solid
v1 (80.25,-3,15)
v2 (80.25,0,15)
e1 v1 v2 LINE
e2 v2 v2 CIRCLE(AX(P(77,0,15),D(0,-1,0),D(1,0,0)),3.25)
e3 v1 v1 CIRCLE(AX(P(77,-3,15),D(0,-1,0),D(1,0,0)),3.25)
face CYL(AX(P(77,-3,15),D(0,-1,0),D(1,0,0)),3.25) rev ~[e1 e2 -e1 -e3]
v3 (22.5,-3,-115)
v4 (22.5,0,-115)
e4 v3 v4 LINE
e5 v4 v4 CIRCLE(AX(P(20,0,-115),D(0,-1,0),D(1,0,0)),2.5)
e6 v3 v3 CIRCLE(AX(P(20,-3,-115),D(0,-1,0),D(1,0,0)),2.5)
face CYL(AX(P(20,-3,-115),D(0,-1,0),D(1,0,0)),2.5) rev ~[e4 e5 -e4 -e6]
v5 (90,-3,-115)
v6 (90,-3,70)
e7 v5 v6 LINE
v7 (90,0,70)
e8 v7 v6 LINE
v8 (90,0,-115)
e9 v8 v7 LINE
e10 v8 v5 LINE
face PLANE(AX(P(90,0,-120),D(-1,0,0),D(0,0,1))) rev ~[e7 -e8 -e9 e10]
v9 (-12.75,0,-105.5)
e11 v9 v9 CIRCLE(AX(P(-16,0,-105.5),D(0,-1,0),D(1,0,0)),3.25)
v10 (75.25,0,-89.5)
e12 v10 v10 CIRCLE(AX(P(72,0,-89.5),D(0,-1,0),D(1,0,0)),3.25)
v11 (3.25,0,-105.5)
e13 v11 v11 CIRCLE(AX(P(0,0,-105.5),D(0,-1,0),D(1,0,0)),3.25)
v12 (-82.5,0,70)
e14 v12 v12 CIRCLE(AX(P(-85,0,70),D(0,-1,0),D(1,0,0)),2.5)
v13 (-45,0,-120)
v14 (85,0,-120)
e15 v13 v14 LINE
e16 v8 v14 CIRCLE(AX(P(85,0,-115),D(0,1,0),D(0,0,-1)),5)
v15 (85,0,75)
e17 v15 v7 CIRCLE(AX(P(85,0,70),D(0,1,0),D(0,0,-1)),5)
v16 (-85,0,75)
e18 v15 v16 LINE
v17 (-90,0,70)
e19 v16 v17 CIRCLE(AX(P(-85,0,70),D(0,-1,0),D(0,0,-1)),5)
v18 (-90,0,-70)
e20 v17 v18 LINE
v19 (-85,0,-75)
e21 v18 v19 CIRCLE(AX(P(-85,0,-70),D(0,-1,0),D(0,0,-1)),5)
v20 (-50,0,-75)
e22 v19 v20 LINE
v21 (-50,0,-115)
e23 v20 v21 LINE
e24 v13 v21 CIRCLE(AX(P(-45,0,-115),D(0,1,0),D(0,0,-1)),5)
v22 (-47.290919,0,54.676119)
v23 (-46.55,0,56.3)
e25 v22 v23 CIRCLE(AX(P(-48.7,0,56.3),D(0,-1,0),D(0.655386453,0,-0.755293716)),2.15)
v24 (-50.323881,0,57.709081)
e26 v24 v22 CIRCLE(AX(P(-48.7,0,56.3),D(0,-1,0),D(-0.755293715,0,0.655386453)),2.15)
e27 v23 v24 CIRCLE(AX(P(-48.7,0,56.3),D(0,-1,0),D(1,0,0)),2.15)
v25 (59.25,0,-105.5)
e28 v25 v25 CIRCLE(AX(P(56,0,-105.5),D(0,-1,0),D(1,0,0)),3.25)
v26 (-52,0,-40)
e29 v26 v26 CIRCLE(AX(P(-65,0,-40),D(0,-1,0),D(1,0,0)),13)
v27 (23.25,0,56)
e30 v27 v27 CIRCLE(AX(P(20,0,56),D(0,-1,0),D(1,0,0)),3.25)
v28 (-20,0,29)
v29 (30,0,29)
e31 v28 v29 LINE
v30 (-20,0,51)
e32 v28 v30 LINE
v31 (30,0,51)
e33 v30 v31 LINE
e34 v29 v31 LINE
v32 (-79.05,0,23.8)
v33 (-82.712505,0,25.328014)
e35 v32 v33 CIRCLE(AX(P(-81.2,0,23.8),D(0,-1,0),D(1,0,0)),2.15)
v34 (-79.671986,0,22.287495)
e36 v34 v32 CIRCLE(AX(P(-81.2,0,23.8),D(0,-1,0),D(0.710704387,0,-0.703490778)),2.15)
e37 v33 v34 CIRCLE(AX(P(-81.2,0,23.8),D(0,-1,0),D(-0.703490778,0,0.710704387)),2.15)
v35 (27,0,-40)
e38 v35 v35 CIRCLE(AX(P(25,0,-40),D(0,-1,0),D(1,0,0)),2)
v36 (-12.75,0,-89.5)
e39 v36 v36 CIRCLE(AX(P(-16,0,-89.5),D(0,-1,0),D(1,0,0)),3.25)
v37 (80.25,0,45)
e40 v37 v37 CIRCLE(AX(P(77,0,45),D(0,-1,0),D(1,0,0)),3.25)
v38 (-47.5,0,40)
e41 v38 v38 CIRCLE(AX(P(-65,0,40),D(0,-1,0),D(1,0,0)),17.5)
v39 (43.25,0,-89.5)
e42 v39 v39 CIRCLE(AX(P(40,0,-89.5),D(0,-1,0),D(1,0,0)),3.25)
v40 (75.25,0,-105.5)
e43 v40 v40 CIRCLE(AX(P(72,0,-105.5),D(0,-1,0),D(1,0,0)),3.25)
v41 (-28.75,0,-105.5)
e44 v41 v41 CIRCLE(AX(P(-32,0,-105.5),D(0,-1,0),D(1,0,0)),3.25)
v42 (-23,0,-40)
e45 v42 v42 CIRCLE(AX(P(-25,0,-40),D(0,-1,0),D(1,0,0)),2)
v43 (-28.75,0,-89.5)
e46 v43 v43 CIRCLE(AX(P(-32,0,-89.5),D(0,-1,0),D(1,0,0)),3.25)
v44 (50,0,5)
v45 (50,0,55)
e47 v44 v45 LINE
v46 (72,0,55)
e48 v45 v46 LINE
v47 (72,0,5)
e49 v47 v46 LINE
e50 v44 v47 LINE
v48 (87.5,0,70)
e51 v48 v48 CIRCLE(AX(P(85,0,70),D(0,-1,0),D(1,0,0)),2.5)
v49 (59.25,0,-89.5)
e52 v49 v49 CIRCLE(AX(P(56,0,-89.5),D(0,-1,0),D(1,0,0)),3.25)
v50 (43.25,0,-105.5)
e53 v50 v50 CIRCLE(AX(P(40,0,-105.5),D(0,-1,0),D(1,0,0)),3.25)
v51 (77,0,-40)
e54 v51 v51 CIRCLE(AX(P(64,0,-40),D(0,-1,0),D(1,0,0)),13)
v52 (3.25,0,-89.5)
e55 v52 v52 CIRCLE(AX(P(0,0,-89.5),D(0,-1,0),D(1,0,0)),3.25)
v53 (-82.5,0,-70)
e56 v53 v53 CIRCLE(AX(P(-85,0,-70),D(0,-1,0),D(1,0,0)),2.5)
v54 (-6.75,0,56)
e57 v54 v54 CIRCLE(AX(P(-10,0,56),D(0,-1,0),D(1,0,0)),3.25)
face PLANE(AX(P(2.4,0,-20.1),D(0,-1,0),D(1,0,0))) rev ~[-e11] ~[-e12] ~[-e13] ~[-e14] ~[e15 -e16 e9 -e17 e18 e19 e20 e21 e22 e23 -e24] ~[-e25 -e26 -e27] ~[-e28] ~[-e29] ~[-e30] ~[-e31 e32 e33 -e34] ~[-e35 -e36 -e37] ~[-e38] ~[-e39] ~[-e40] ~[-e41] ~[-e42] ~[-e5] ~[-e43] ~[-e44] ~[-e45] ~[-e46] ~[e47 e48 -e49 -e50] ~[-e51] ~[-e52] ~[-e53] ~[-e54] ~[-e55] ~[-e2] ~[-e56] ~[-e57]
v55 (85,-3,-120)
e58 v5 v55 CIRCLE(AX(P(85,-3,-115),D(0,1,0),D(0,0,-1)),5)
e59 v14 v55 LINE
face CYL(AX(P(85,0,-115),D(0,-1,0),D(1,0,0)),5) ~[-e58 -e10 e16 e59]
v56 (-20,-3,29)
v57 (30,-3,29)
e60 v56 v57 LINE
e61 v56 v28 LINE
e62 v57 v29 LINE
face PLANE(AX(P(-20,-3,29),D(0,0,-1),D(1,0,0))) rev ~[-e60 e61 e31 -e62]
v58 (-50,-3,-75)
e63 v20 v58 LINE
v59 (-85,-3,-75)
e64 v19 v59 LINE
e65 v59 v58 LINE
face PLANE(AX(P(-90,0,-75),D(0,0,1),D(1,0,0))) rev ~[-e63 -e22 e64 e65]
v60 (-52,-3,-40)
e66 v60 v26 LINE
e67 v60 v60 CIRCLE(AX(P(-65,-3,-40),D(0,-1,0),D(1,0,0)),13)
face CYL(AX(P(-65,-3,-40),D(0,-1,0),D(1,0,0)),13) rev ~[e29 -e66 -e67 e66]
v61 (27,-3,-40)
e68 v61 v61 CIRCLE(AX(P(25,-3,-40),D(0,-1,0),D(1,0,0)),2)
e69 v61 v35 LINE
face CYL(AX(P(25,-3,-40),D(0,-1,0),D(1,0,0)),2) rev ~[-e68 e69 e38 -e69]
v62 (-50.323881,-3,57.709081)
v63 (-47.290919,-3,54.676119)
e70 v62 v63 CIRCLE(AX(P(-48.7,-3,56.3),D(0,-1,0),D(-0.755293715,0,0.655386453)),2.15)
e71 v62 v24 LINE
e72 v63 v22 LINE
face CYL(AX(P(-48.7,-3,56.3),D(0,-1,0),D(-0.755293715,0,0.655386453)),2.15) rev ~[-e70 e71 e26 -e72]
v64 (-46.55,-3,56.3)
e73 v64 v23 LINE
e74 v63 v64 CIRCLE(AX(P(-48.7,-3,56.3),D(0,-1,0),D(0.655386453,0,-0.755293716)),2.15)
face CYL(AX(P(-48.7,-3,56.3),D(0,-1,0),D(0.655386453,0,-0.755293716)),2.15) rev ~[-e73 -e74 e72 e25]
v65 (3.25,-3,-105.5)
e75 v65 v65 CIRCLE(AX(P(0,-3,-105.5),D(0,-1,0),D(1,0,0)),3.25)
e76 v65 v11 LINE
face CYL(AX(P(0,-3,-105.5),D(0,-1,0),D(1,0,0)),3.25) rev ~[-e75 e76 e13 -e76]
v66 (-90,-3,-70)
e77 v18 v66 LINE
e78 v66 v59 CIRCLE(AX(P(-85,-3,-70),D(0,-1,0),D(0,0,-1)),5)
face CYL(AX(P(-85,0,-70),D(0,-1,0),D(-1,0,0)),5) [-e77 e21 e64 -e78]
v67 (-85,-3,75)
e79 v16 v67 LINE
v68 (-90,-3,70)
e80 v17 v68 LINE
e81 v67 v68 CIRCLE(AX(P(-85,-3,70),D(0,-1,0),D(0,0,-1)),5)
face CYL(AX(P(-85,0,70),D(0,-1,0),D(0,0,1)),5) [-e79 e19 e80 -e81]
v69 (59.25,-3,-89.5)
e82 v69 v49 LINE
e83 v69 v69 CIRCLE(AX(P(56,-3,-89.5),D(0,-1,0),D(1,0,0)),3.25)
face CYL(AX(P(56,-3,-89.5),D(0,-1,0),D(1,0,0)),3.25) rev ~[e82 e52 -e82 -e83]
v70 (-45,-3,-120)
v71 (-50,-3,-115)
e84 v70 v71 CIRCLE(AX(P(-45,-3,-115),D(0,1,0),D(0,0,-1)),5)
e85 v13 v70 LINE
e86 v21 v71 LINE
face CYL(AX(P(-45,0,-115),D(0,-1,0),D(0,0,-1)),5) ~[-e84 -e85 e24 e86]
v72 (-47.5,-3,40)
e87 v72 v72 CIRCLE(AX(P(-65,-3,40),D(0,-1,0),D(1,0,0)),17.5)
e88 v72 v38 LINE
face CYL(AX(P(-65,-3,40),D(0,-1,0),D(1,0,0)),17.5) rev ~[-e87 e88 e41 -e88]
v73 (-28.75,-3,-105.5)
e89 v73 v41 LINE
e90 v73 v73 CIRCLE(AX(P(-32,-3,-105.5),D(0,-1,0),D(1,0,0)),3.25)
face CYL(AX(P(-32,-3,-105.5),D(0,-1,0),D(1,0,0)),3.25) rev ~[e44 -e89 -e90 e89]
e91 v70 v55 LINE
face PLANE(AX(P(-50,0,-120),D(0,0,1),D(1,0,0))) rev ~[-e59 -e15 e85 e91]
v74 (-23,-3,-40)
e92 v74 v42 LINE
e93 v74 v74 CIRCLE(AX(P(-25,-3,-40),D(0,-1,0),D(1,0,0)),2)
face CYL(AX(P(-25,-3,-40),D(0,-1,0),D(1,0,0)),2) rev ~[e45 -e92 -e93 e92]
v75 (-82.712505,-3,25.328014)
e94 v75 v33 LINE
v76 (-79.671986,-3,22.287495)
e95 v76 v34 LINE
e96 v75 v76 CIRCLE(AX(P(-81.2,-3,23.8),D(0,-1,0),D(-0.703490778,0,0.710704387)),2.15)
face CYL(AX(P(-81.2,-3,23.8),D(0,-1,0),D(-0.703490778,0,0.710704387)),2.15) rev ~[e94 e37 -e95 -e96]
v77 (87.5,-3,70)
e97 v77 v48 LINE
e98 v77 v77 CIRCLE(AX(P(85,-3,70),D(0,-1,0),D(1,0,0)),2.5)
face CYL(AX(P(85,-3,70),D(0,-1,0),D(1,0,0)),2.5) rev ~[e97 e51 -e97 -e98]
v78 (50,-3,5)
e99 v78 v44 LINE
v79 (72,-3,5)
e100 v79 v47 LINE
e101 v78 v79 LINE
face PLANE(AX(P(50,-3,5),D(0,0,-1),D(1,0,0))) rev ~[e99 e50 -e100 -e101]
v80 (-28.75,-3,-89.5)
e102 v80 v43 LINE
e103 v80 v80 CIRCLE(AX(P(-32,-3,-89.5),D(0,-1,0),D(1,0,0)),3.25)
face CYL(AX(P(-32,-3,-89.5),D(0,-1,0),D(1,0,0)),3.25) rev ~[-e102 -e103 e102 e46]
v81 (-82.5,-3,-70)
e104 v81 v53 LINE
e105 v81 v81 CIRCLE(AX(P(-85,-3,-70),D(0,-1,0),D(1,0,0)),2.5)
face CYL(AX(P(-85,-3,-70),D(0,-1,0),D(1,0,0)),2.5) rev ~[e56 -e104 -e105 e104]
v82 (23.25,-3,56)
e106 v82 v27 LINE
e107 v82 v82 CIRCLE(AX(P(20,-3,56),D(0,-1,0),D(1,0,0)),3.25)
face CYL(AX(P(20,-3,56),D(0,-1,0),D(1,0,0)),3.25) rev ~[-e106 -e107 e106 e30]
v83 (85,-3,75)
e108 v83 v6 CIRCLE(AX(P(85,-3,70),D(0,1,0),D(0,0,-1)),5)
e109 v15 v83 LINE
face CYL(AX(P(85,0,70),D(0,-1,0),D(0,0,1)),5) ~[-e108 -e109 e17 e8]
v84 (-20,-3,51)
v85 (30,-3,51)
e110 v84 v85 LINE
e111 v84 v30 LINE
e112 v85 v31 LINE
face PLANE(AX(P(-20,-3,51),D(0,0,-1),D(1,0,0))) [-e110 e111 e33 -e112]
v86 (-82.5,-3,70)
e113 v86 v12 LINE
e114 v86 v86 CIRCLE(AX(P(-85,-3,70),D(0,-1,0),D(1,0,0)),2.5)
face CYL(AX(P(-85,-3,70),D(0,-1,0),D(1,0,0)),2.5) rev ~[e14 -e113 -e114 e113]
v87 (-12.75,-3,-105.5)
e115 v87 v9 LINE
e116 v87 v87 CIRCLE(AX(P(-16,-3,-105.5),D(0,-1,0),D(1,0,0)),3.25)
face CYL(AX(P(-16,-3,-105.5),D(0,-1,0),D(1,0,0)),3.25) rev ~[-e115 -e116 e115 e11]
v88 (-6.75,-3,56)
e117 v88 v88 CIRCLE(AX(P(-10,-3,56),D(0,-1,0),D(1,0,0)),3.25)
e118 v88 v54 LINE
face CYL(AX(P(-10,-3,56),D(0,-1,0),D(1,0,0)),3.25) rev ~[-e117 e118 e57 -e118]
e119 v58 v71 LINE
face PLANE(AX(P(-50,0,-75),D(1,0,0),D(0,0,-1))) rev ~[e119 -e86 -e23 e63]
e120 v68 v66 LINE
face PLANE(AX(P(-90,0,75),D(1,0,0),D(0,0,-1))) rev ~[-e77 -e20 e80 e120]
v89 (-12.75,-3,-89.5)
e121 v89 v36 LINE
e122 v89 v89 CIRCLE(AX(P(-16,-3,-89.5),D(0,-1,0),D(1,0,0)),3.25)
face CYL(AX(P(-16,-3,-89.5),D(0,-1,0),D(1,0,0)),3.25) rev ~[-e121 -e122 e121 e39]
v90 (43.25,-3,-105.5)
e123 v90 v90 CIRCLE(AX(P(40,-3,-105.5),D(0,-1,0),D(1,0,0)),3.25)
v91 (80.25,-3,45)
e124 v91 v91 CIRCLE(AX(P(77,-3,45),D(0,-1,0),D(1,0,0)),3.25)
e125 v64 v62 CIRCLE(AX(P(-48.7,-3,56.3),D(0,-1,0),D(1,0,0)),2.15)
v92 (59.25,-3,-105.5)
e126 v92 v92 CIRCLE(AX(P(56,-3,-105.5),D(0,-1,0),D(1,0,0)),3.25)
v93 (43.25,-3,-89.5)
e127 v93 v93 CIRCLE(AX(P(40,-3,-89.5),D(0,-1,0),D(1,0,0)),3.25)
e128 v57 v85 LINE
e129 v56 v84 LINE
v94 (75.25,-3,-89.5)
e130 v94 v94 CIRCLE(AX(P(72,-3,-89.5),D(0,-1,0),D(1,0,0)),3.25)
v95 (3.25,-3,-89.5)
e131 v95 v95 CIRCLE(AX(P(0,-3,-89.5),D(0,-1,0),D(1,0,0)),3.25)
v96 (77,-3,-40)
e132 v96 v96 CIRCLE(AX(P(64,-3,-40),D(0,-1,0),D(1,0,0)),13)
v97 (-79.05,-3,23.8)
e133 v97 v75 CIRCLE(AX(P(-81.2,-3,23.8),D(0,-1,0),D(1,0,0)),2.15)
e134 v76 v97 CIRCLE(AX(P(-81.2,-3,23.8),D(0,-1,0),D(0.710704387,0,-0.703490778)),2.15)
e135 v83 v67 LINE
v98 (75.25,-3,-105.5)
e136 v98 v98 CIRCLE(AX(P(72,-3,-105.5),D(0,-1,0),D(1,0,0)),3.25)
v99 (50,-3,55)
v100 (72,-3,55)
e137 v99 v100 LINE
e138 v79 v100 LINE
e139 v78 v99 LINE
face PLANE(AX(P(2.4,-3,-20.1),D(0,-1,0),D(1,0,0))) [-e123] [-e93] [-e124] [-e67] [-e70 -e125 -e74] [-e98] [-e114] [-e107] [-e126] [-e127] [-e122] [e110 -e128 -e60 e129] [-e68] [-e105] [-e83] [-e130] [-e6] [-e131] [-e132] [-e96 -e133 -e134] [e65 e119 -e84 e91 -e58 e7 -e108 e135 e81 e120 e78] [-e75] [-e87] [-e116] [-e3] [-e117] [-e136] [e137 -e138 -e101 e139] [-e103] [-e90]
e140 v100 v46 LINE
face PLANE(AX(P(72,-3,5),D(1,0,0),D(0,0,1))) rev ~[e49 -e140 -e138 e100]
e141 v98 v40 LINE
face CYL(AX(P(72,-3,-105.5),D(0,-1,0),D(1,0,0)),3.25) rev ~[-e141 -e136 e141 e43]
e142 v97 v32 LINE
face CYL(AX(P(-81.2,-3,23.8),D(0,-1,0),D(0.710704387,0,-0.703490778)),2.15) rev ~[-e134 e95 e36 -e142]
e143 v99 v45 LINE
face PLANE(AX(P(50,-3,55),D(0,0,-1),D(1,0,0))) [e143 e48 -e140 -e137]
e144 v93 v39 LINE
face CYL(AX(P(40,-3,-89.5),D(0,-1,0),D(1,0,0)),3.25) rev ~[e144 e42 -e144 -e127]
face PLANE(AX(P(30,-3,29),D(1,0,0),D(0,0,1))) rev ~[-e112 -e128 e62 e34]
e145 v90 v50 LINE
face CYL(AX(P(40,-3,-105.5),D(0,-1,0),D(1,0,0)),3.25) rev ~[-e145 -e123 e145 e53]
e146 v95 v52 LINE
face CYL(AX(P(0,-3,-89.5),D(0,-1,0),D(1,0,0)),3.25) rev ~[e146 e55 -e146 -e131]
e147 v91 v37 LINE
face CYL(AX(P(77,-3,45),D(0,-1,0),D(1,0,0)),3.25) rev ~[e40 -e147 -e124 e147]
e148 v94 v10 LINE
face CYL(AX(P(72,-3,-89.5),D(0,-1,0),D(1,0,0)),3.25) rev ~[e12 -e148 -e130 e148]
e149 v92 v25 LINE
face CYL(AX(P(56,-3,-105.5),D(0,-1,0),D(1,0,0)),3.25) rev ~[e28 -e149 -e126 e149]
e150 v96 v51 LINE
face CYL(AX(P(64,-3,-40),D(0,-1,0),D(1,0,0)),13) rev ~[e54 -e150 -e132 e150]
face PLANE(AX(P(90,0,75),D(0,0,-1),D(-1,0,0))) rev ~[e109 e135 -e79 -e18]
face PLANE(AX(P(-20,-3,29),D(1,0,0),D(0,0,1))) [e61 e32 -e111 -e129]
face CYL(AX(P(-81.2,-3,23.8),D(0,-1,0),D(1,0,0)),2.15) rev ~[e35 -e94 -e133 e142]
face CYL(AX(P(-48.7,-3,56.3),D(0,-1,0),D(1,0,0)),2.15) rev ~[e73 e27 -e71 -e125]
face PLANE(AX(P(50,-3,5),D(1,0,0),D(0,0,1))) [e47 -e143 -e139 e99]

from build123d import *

# Parameters (mm, degrees)
F1_DEPTH = 3
F2_R     = 17.5
F2_R_2   = 13
F2_R_3   = 2
F2_W     = 22
F2_H     = 50
F2_W_2   = 50
F2_H_2   = 22
F3_DEPTH = 3
F4_R     = 2.5
F5_DEPTH = 3
F6_R     = 3.25
F7_DEPTH = 3
F8_R     = 3.25
F9_DEPTH = 3
F10_R    = 5


# Not quite as in the source:
# - a feature names something its author has since deleted; it is built from what else it names


with BuildPart() as f1:
    # F0 (on Front) → F1 (new body)
    with BuildSketch(Plane.XZ):
        Polygon((90, -75), (90, 75), (-90, 75), (-90, -75), (-50, -75), (-50, -120), (90, -120), align=None)
    extrude(amount=F1_DEPTH)

    # F2 (on face) → F3 (cut, through all)
    with BuildSketch(Plane.XZ.offset(3)):
        with Locations((-65, 40)):
            Circle(F2_R)
        with Locations((-65, -40)):
            Circle(F2_R_2)
        with BuildLine():
            ThreePointArc((-50.3238814883, 57.7090808748), (-50.2202795796, 54.7797204204), (-47.2909191252, 54.6761185117))
            ThreePointArc((-47.2909191252, 54.6761185117), (-48.7365440327, 56.2634559673), (-50.3238814883, 57.7090808748))
        make_face()
        with BuildLine():
            ThreePointArc((-50.3238814883, 57.7090808748), (-48.7365440327, 56.2634559673), (-47.2909191252, 54.6761185117))
            ThreePointArc((-47.2909191252, 54.6761185117), (-46.7439805879, 55.4075382028), (-46.55, 56.3))
            ThreePointArc((-46.55, 56.3), (-47.9479511984, 58.3141803792), (-50.3238814883, 57.7090808748))
        make_face()
        with BuildLine():
            ThreePointArc((-82.7125051724, 25.3280144317), (-82.7202795796, 22.2797204204), (-79.6719855683, 22.2874948276))
            ThreePointArc((-79.6719855683, 22.2874948276), (-81.2634559673, 23.7365440327), (-82.7125051724, 25.3280144317))
        make_face()
        with BuildLine():
            ThreePointArc((-82.7125051724, 25.3280144317), (-81.2634559673, 23.7365440327), (-79.6719855683, 22.2874948276))
            ThreePointArc((-79.6719855683, 22.2874948276), (-79.2115670708, 22.9822992687), (-79.05, 23.8))
            ThreePointArc((-79.05, 23.8), (-80.3721673239, 25.7842361403), (-82.7125051724, 25.3280144317))
        make_face()
        with Locations((-25, -40)):
            Circle(F2_R_3)
        with Locations((25, -40)):
            Circle(F2_R_3)
        with Locations((64, -40)):
            Circle(F2_R_2)
        with Locations((61, 30)):
            Rectangle(F2_W, F2_H)
        with Locations((5, 40)):
            Rectangle(F2_W_2, F2_H_2)
    extrude(amount=-F3_DEPTH, mode=Mode.SUBTRACT)

    # F4 (on face) → F5 (cut, through all)
    with BuildSketch(Plane.XZ.offset(3)):
        with Locations((-85, 70)):
            Circle(F4_R)
        with Locations((85, 70)):
            Circle(F4_R)
        with Locations((20, -115)):
            Circle(F4_R)
        with Locations((-85, -70)):
            Circle(F4_R)
    extrude(amount=-F5_DEPTH, mode=Mode.SUBTRACT)

    # F6 (on face) → F7 (cut, through all)
    with BuildSketch(Plane.XZ.offset(3)):
        with Locations((-32, -89.5)):
            Circle(F6_R)
        with Locations((-16, -89.5)):
            Circle(F6_R)
        with Locations((0, -89.5)):
            Circle(F6_R)
        with Locations((40, -89.5)):
            Circle(F6_R)
        with Locations((56, -89.5)):
            Circle(F6_R)
        with Locations((72, -89.5)):
            Circle(F6_R)
        with Locations((72, -105.5)):
            Circle(F6_R)
        with Locations((56, -105.5)):
            Circle(F6_R)
        with Locations((40, -105.5)):
            Circle(F6_R)
        with Locations((-32, -105.5)):
            Circle(F6_R)
        with Locations((-16, -105.5)):
            Circle(F6_R)
        with Locations((0, -105.5)):
            Circle(F6_R)
    extrude(amount=-F7_DEPTH, mode=Mode.SUBTRACT)

    # F8 (on face) → F9 (cut, through all)
    with BuildSketch(Plane.XZ.offset(3)):
        with Locations((-10, 56)):
            Circle(F8_R)
        with Locations((20, 56)):
            Circle(F8_R)
        with Locations((77, 15)):
            Circle(F8_R)
        with Locations((77, 45)):
            Circle(F8_R)
    extrude(amount=-F9_DEPTH, mode=Mode.SUBTRACT)

    # F10
    f10_edges = [f1.edges().sort_by_distance(p)[0] for p in [
        (90, -1.5, 75),
        (-90, -1.5, 75),
        (-90, -1.5, -75),
        (-50, -1.5, -120),
        (90, -1.5, -120),
    ]]
    fillet(f10_edges, radius=F10_R)


solid = f1.part
